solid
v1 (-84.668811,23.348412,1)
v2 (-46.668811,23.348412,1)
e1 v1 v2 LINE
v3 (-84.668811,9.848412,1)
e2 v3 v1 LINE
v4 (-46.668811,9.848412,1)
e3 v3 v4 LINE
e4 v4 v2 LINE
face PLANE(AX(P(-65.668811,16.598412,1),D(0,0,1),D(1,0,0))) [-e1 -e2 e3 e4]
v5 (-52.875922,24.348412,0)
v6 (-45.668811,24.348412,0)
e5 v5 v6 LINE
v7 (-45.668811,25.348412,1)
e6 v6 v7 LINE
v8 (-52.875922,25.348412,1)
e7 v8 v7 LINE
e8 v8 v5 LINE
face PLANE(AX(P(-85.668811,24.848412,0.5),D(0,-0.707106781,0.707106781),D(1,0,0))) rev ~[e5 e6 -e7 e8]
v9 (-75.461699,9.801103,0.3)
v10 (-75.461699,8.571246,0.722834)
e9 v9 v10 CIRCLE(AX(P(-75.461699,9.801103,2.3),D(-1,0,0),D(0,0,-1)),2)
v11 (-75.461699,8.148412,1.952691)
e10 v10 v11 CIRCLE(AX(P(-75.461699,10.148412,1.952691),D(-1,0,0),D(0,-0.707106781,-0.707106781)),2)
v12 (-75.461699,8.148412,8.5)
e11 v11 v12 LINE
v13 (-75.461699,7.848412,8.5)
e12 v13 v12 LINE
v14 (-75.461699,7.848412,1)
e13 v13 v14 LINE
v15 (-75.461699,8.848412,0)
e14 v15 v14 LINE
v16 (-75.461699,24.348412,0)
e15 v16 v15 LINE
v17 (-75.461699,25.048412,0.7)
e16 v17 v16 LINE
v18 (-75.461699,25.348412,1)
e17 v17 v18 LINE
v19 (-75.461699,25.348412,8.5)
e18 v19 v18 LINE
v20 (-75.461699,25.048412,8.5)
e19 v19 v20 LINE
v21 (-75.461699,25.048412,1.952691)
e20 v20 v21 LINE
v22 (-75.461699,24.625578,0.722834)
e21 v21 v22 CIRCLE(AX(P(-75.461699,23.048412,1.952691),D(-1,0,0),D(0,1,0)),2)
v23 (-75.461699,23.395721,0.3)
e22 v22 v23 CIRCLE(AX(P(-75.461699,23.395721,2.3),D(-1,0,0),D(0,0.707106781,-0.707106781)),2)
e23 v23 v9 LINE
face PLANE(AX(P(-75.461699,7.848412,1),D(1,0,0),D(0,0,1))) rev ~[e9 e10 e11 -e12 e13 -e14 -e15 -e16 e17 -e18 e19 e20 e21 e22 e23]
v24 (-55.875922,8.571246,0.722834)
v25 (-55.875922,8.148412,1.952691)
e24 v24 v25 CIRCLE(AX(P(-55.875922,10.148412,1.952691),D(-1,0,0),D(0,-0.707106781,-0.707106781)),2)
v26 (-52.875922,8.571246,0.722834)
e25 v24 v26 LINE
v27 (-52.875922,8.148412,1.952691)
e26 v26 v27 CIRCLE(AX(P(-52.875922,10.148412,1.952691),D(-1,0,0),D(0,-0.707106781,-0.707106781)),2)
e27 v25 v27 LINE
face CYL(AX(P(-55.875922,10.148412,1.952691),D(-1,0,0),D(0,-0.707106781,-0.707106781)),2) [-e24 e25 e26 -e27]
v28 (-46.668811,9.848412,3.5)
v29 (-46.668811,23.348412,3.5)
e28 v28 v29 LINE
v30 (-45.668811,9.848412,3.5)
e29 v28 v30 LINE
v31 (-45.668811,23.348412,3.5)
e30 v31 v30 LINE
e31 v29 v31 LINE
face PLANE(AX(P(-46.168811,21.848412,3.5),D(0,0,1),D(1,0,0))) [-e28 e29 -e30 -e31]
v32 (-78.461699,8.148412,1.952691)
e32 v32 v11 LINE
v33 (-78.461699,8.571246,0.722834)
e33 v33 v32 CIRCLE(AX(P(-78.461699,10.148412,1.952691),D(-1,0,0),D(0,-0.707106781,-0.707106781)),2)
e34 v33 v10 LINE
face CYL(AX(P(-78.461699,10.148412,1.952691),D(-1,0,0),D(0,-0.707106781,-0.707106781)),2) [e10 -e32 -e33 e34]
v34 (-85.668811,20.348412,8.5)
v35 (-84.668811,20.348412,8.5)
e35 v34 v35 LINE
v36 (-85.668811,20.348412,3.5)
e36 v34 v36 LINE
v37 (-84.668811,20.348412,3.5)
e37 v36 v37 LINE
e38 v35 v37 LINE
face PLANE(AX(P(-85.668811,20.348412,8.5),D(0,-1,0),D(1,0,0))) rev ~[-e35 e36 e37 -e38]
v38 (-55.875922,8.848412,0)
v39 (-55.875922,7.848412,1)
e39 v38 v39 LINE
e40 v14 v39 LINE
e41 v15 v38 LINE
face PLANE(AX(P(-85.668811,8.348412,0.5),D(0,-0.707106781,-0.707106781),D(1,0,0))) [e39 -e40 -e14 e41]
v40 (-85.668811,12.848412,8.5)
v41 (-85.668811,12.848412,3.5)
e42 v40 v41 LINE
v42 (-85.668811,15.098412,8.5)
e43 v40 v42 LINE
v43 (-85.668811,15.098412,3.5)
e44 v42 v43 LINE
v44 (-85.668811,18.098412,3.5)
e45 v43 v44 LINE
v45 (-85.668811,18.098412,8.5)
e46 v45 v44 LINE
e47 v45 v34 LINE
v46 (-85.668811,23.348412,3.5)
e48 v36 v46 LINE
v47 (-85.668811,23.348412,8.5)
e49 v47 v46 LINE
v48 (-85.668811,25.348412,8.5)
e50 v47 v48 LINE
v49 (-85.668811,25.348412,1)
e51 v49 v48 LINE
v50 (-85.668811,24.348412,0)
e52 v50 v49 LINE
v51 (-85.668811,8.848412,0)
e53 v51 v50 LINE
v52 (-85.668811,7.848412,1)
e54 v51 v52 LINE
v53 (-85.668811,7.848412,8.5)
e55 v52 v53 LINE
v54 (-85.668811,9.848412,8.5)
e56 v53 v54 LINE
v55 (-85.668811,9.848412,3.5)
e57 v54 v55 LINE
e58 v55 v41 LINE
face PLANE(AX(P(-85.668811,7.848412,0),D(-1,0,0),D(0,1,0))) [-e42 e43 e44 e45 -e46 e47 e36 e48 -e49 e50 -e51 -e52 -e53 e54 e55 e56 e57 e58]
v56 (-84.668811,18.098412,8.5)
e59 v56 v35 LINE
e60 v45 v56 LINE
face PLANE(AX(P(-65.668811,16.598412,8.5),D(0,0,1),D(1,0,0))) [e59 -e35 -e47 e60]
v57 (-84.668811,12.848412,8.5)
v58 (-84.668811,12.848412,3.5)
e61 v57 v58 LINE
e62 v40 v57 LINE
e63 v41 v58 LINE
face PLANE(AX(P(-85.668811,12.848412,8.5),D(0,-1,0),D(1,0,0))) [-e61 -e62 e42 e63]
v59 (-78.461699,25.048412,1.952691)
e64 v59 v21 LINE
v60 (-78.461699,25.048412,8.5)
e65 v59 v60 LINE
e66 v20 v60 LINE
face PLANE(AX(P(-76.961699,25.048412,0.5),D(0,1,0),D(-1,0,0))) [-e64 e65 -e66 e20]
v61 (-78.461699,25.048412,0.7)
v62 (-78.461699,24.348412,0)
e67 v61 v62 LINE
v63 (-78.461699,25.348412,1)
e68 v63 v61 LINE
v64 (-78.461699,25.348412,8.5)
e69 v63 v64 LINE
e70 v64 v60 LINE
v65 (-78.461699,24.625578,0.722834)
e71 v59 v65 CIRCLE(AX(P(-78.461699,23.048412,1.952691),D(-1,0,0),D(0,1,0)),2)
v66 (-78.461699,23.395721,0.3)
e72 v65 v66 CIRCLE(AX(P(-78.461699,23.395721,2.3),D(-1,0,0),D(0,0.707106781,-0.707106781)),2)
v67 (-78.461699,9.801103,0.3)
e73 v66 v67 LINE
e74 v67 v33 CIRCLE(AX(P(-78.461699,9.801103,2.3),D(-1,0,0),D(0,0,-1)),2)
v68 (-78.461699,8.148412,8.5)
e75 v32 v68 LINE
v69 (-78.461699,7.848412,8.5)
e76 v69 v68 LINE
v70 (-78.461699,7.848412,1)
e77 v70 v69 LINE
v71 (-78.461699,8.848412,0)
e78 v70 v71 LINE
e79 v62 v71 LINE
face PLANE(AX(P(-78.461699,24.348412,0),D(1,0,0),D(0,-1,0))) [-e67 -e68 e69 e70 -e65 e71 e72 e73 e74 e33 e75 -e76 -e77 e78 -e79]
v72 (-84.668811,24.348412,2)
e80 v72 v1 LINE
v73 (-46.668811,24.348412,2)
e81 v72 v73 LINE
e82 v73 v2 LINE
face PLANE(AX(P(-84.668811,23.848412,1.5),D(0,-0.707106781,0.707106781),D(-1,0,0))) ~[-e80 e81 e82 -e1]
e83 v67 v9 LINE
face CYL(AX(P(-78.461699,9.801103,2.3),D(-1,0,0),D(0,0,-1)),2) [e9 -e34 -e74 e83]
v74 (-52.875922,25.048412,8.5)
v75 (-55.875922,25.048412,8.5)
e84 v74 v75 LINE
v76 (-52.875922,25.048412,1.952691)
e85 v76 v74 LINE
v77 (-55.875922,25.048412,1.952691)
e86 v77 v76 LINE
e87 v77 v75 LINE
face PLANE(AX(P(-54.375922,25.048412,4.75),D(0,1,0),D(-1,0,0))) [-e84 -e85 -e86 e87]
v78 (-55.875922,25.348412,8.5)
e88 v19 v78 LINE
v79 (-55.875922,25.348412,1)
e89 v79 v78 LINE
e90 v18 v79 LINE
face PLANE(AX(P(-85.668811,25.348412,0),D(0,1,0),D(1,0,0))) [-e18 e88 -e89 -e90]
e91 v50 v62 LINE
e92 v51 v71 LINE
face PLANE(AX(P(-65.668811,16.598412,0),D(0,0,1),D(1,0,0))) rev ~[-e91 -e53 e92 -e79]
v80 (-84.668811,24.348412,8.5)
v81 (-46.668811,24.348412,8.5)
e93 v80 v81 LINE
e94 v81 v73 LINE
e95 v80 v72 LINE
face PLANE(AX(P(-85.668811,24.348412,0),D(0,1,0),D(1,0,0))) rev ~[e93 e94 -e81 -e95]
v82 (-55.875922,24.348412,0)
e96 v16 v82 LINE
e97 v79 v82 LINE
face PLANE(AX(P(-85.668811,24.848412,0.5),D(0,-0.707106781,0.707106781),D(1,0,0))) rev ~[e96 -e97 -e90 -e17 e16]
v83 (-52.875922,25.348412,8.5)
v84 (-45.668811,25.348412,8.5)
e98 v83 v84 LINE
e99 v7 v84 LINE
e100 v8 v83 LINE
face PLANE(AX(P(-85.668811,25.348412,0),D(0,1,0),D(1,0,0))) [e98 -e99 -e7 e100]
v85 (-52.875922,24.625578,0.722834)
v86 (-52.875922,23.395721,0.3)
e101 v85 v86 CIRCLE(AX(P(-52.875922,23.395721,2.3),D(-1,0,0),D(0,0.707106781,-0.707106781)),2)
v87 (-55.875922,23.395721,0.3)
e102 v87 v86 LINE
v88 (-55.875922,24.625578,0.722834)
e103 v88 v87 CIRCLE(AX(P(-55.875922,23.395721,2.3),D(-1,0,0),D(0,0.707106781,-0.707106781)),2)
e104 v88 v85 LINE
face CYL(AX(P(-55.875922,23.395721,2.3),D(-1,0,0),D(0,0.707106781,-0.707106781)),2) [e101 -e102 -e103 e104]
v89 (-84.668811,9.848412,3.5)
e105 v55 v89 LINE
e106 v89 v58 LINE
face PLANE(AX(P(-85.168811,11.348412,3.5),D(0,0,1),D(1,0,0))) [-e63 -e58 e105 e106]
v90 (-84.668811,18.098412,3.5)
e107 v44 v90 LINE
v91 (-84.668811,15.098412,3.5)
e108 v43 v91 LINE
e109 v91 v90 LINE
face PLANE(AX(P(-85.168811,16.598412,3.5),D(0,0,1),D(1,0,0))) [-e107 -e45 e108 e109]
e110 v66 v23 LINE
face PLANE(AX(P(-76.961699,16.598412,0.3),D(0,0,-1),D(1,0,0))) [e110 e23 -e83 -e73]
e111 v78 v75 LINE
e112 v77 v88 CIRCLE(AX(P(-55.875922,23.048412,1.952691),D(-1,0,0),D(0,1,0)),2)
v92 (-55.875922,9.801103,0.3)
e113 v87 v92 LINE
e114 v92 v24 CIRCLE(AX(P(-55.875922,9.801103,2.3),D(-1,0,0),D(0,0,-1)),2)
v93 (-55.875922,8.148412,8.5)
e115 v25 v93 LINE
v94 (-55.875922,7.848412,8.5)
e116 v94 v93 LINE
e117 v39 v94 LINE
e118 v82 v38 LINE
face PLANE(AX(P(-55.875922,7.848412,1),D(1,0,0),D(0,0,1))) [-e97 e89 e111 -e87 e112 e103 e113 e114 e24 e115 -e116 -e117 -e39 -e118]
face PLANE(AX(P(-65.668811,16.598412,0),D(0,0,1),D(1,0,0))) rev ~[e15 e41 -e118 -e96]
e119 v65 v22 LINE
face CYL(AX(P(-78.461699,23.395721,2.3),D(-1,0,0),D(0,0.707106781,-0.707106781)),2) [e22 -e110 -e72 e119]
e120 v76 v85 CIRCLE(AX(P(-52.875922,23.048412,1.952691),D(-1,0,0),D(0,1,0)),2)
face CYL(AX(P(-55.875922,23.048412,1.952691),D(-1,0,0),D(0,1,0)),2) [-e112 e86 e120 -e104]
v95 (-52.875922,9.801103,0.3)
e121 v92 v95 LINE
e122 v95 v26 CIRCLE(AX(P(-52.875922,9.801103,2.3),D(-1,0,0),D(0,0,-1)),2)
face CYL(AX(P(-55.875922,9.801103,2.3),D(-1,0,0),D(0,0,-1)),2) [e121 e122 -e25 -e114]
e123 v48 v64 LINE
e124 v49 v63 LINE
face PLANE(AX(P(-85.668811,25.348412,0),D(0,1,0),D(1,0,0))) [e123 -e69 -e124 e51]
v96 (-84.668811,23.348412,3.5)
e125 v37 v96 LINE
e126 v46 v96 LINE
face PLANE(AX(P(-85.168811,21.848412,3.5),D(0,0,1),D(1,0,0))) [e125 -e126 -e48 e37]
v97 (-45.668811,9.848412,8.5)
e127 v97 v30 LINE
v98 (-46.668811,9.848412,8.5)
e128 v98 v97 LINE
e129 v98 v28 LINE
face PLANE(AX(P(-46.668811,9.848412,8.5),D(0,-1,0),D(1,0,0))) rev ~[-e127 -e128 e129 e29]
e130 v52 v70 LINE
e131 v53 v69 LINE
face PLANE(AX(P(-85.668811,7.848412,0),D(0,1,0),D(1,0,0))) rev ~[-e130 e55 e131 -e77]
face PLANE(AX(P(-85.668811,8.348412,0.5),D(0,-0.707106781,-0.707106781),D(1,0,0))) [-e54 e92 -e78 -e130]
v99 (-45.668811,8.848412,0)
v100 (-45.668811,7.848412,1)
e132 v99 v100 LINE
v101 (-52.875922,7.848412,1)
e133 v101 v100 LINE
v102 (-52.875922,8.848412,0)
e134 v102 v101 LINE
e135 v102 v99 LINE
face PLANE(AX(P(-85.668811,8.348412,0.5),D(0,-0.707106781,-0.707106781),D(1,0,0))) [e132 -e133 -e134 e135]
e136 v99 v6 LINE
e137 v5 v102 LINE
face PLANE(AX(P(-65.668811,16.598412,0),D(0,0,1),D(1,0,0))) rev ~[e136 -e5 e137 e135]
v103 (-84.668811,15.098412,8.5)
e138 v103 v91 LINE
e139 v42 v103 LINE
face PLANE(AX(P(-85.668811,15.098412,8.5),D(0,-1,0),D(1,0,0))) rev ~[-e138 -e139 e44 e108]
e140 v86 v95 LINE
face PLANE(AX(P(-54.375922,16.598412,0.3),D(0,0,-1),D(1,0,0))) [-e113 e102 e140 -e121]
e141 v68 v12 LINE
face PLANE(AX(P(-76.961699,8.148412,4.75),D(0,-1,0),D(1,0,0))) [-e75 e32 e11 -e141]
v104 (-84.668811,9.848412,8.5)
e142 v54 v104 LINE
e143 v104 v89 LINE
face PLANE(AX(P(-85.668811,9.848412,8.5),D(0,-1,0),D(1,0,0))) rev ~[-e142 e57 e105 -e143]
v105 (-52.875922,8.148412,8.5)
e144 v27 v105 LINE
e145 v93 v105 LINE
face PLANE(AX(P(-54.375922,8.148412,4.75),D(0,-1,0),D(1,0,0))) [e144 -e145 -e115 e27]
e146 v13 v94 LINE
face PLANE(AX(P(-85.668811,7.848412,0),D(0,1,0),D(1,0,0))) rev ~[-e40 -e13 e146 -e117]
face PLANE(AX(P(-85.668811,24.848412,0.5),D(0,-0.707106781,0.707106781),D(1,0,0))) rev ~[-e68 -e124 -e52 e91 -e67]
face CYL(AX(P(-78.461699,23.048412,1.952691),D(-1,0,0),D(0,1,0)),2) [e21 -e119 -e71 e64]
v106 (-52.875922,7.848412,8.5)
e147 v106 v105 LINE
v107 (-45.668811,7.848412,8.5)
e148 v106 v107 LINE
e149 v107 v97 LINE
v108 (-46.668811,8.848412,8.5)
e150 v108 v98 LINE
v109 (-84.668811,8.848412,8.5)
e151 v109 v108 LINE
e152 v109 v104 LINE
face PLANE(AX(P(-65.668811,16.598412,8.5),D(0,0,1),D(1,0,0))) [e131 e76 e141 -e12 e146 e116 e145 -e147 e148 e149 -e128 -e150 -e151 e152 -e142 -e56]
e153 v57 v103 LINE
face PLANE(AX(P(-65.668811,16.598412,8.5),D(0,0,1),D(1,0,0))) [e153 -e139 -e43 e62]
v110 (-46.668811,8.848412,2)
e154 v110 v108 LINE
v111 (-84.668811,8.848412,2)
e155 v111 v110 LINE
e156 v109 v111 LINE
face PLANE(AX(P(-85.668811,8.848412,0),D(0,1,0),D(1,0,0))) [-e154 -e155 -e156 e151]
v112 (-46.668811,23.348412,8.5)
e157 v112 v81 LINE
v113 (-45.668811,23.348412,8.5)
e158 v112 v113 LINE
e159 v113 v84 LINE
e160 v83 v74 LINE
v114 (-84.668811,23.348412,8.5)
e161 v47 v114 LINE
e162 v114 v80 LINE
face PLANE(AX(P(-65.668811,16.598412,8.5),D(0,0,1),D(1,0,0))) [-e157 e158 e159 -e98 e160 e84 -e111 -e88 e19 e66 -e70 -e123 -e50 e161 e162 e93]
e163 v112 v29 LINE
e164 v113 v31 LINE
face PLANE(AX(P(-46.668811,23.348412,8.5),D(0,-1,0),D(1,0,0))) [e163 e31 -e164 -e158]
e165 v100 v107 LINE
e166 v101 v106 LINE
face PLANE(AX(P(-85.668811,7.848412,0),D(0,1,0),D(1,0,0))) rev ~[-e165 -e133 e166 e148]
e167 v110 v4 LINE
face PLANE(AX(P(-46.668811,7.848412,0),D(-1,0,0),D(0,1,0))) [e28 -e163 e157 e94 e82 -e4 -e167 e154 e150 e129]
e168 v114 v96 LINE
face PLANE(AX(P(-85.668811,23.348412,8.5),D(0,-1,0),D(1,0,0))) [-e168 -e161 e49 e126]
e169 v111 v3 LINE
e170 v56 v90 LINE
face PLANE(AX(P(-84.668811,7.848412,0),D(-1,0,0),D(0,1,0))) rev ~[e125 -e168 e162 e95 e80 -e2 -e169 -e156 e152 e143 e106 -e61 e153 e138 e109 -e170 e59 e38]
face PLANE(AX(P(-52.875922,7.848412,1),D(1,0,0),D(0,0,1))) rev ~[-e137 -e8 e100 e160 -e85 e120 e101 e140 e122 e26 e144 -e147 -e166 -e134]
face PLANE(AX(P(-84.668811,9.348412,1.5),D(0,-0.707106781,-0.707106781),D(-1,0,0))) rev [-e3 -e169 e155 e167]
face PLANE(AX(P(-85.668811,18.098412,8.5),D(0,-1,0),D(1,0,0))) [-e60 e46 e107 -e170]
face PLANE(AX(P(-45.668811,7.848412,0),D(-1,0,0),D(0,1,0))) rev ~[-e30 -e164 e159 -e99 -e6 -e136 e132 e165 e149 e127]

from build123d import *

# Parameters (mm, degrees)
F0_W         = 40
F0_H         = 17.5
F1_DEPTH     = 8.5
F2_T         = -1
F3_W         = 1
F3_H         = 3
F4_DEPTH     = 5
F5_SIZE      = 1
F8_W         = 3
F8_H         = 1
F8_H_2       = 7.5
F11_DEPTH    = 0.3
F7_W         = 3
F7_H         = 1.4142135624
F12_DEPTH    = 0.3
F6_W         = 3
F6_H         = 15.5
F13_DEPTH    = 0.3
F9_W         = 3
F9_H         = 7.5
F14_DEPTH    = 0.3
F10_W        = 3
F10_H        = 5.3033008589
F10_H_2      = 1.4142135624
F15_DEPTH    = 0.3
F16_T1_DEPTH = 3
F16_T3_DEPTH = 3
F18_W        = 2.25
F18_H        = 5
F19_DEPTH    = 25


# Not quite as in the source:
# - a fillet or chamfer that OpenCascade refuses, or shapes differently, is made with other operations: its cross-section is extruded or revolved along the edge and cut away or added
# - two fillets or chamfers of one size are made in one step


with BuildPart() as f1:
    # F0 (on Top) → F1 (new body)
    with BuildSketch(Plane.XY):
        with Locations((-65.668810606, 16.5984117985)):
            Rectangle(F0_W, F0_H)
    extrude(amount=F1_DEPTH)

    # F2
    f2_openings = [f1.faces().sort_by_distance(p)[0] for p in [
        (-65.668811, 16.598412, 8.5),
    ]]
    offset(amount=F2_T, openings=f2_openings)

    # F3 (on face) → F4 (cut)
    with BuildSketch(Plane.XY.offset(8.5)):
        with Locations((-85.168810606, 21.8484117985)):
            Rectangle(F3_W, F3_H)
        with Locations((-85.168810606, 16.5984117985)):
            Rectangle(F3_W, F3_H)
        with Locations((-85.168810606, 11.3484117985)):
            Rectangle(F3_W, F3_H)
        with Locations((-46.168810606, 11.3484117985)):
            Rectangle(F3_W, F3_H)
        with Locations((-46.168810606, 16.5984117985)):
            Rectangle(F3_W, F3_H)
        with Locations((-46.168810606, 21.8484117985)):
            Rectangle(F3_W, F3_H)
    extrude(amount=-F4_DEPTH, mode=Mode.SUBTRACT)

    # F5
    f5_edges = [f1.edges().sort_by_distance(p)[0] for p in [
        (-65.668811, 7.848412, 0),
        (-65.668811, 25.348412, 0),
        (-65.668811, 24.348412, 1),
        (-65.668811, 8.848412, 1),
    ]]
    chamfer(f5_edges, length=F5_SIZE)

    # F8 (on face) → F11 (cut)
    with BuildSketch(Plane(origin=(0, 25.3484117985, 0), x_dir=(-1, 0, 0), z_dir=(0, 1, 0))):
        with Locations((76.9616991878, 0.5)):
            Rectangle(F8_W, F8_H)
        with Locations((76.9616991878, 4.75)):
            Rectangle(F8_W, F8_H_2)
        with Locations((54.3759220243, 4.75)):
            Rectangle(F8_W, F8_H_2)
    extrude(amount=-F11_DEPTH, mode=Mode.SUBTRACT)

    # F7 (on face) → F12 (cut)
    with BuildSketch(Plane(origin=(0, 12.1742058992, -12.1742058992), x_dir=(1, 0, 0), z_dir=(0, 0.7071067812, -0.7071067812))):
        with Locations((-76.9616991878, -17.924033875)):
            Rectangle(F7_W, F7_H)
        with Locations((-54.3759220243, -17.924033875)):
            Rectangle(F7_W, F7_H)
    extrude(amount=-F12_DEPTH, mode=Mode.SUBTRACT)

    # F6 (on face) → F13 (cut)
    with BuildSketch(Plane(origin=(0, 0, 0), x_dir=(1, 0, 0), z_dir=(0, 0, -1))):
        with Locations((-76.9616991878, -16.5984117985)):
            Rectangle(F6_W, F6_H)
        with Locations((-54.3759220243, -16.5984117985)):
            Rectangle(F6_W, F6_H)
    extrude(amount=-F13_DEPTH, mode=Mode.SUBTRACT)

    # F9 (on face) → F14 (cut)
    with BuildSketch(Plane.XZ.offset(-7.8484117985)):
        with Locations((-76.9616991878, 4.75)):
            Rectangle(F9_W, F9_H)
        with Locations((-54.3759220243, 4.75)):
            Rectangle(F9_W, F9_H)
    extrude(amount=-F14_DEPTH, mode=Mode.SUBTRACT)

    # F10 (on face) → F15 (cut)
    with BuildSketch(Plane(origin=(0, 4.4242058992, 4.4242058992), x_dir=(1, 0, 0), z_dir=(0, -0.7071067812, -0.7071067812))):
        with Locations((-76.9616991878, -2.1909079936)):
            Rectangle(F10_W, F10_H)
        with Locations((-76.9616991878, -5.5496652042)):
            Rectangle(F10_W, F10_H_2)
        with Locations((-54.3759220243, -5.5496652042)):
            Rectangle(F10_W, F10_H_2)
    extrude(amount=-F15_DEPTH, mode=Mode.SUBTRACT)

    # F16: fillet of radius 2 on 8 edges, made by hand

    # F16_s2 → F16_t1 (cut)
    with BuildSketch(Plane.YZ.offset(-55.8759220243)):
        with BuildLine():
            ThreePointArc((8.7341982361, 0.5384776311), (8.3006527335, 1.1873243287), (8.1484117985, 1.9526911935))
            Line((8.1484117985, 1.9526911935), (8.1484117985, 1.1242640687))
            Line((8.1484117985, 1.1242640687), (8.7341982361, 0.5384776311))
        make_face()
        with BuildLine():
            ThreePointArc((9.8011029919, 0.3), (9.0357361272, 0.452240935), (8.3868894296, 0.8857864376))
            Line((8.3868894296, 0.8857864376), (8.9726758672, 0.3))
            Line((8.9726758672, 0.3), (9.8011029919, 0.3))
        make_face()
        with BuildLine():
            ThreePointArc((25.0484117985, 1.9526911935), (24.8961708635, 1.1873243287), (24.4626253609, 0.5384776311))
            Line((24.4626253609, 0.5384776311), (25.0484117985, 1.1242640687))
            Line((25.0484117985, 1.1242640687), (25.0484117985, 1.9526911935))
        make_face()
        with BuildLine():
            ThreePointArc((24.8099341674, 0.8857864376), (24.1610874697, 0.452240935), (23.395720605, 0.3))
            Line((23.395720605, 0.3), (24.2241477298, 0.3))
            Line((24.2241477298, 0.3), (24.8099341674, 0.8857864376))
        make_face()
    extrude(amount=F16_T1_DEPTH, mode=Mode.SUBTRACT)

    # F16_s4 → F16_t3 (cut)
    with BuildSketch(Plane.YZ.offset(-78.4616991878)):
        with BuildLine():
            ThreePointArc((9.8011029919, 0.3), (9.0357361272, 0.452240935), (8.3868894296, 0.8857864376))
            Line((8.3868894296, 0.8857864376), (8.9726758672, 0.3))
            Line((8.9726758672, 0.3), (9.8011029919, 0.3))
        make_face()
        with BuildLine():
            ThreePointArc((8.7341982361, 0.5384776311), (8.3006527335, 1.1873243287), (8.1484117985, 1.9526911935))
            Line((8.1484117985, 1.9526911935), (8.1484117985, 1.1242640687))
            Line((8.1484117985, 1.1242640687), (8.7341982361, 0.5384776311))
        make_face()
        with BuildLine():
            ThreePointArc((24.8099341674, 0.8857864376), (24.1610874697, 0.452240935), (23.395720605, 0.3))
            Line((23.395720605, 0.3), (24.2241477298, 0.3))
            Line((24.2241477298, 0.3), (24.8099341674, 0.8857864376))
        make_face()
        with BuildLine():
            ThreePointArc((25.0484117985, 1.9526911935), (24.8961708635, 1.1873243287), (24.4626253609, 0.5384776311))
            Line((24.4626253609, 0.5384776311), (25.0484117985, 1.1242640687))
            Line((25.0484117985, 1.1242640687), (25.0484117985, 1.9526911935))
        make_face()
    extrude(amount=F16_T3_DEPTH, mode=Mode.SUBTRACT)

    # F18 (on face) → F19 (cut)
    with BuildSketch(Plane.YZ.offset(-45.668810606)):
        with Locations((13.9734117985, 6)):
            Rectangle(F18_W, F18_H)
        with Locations((19.2234117985, 6)):
            Rectangle(F18_W, F18_H)
    extrude(amount=-F19_DEPTH, mode=Mode.SUBTRACT)


solid = f1.part
